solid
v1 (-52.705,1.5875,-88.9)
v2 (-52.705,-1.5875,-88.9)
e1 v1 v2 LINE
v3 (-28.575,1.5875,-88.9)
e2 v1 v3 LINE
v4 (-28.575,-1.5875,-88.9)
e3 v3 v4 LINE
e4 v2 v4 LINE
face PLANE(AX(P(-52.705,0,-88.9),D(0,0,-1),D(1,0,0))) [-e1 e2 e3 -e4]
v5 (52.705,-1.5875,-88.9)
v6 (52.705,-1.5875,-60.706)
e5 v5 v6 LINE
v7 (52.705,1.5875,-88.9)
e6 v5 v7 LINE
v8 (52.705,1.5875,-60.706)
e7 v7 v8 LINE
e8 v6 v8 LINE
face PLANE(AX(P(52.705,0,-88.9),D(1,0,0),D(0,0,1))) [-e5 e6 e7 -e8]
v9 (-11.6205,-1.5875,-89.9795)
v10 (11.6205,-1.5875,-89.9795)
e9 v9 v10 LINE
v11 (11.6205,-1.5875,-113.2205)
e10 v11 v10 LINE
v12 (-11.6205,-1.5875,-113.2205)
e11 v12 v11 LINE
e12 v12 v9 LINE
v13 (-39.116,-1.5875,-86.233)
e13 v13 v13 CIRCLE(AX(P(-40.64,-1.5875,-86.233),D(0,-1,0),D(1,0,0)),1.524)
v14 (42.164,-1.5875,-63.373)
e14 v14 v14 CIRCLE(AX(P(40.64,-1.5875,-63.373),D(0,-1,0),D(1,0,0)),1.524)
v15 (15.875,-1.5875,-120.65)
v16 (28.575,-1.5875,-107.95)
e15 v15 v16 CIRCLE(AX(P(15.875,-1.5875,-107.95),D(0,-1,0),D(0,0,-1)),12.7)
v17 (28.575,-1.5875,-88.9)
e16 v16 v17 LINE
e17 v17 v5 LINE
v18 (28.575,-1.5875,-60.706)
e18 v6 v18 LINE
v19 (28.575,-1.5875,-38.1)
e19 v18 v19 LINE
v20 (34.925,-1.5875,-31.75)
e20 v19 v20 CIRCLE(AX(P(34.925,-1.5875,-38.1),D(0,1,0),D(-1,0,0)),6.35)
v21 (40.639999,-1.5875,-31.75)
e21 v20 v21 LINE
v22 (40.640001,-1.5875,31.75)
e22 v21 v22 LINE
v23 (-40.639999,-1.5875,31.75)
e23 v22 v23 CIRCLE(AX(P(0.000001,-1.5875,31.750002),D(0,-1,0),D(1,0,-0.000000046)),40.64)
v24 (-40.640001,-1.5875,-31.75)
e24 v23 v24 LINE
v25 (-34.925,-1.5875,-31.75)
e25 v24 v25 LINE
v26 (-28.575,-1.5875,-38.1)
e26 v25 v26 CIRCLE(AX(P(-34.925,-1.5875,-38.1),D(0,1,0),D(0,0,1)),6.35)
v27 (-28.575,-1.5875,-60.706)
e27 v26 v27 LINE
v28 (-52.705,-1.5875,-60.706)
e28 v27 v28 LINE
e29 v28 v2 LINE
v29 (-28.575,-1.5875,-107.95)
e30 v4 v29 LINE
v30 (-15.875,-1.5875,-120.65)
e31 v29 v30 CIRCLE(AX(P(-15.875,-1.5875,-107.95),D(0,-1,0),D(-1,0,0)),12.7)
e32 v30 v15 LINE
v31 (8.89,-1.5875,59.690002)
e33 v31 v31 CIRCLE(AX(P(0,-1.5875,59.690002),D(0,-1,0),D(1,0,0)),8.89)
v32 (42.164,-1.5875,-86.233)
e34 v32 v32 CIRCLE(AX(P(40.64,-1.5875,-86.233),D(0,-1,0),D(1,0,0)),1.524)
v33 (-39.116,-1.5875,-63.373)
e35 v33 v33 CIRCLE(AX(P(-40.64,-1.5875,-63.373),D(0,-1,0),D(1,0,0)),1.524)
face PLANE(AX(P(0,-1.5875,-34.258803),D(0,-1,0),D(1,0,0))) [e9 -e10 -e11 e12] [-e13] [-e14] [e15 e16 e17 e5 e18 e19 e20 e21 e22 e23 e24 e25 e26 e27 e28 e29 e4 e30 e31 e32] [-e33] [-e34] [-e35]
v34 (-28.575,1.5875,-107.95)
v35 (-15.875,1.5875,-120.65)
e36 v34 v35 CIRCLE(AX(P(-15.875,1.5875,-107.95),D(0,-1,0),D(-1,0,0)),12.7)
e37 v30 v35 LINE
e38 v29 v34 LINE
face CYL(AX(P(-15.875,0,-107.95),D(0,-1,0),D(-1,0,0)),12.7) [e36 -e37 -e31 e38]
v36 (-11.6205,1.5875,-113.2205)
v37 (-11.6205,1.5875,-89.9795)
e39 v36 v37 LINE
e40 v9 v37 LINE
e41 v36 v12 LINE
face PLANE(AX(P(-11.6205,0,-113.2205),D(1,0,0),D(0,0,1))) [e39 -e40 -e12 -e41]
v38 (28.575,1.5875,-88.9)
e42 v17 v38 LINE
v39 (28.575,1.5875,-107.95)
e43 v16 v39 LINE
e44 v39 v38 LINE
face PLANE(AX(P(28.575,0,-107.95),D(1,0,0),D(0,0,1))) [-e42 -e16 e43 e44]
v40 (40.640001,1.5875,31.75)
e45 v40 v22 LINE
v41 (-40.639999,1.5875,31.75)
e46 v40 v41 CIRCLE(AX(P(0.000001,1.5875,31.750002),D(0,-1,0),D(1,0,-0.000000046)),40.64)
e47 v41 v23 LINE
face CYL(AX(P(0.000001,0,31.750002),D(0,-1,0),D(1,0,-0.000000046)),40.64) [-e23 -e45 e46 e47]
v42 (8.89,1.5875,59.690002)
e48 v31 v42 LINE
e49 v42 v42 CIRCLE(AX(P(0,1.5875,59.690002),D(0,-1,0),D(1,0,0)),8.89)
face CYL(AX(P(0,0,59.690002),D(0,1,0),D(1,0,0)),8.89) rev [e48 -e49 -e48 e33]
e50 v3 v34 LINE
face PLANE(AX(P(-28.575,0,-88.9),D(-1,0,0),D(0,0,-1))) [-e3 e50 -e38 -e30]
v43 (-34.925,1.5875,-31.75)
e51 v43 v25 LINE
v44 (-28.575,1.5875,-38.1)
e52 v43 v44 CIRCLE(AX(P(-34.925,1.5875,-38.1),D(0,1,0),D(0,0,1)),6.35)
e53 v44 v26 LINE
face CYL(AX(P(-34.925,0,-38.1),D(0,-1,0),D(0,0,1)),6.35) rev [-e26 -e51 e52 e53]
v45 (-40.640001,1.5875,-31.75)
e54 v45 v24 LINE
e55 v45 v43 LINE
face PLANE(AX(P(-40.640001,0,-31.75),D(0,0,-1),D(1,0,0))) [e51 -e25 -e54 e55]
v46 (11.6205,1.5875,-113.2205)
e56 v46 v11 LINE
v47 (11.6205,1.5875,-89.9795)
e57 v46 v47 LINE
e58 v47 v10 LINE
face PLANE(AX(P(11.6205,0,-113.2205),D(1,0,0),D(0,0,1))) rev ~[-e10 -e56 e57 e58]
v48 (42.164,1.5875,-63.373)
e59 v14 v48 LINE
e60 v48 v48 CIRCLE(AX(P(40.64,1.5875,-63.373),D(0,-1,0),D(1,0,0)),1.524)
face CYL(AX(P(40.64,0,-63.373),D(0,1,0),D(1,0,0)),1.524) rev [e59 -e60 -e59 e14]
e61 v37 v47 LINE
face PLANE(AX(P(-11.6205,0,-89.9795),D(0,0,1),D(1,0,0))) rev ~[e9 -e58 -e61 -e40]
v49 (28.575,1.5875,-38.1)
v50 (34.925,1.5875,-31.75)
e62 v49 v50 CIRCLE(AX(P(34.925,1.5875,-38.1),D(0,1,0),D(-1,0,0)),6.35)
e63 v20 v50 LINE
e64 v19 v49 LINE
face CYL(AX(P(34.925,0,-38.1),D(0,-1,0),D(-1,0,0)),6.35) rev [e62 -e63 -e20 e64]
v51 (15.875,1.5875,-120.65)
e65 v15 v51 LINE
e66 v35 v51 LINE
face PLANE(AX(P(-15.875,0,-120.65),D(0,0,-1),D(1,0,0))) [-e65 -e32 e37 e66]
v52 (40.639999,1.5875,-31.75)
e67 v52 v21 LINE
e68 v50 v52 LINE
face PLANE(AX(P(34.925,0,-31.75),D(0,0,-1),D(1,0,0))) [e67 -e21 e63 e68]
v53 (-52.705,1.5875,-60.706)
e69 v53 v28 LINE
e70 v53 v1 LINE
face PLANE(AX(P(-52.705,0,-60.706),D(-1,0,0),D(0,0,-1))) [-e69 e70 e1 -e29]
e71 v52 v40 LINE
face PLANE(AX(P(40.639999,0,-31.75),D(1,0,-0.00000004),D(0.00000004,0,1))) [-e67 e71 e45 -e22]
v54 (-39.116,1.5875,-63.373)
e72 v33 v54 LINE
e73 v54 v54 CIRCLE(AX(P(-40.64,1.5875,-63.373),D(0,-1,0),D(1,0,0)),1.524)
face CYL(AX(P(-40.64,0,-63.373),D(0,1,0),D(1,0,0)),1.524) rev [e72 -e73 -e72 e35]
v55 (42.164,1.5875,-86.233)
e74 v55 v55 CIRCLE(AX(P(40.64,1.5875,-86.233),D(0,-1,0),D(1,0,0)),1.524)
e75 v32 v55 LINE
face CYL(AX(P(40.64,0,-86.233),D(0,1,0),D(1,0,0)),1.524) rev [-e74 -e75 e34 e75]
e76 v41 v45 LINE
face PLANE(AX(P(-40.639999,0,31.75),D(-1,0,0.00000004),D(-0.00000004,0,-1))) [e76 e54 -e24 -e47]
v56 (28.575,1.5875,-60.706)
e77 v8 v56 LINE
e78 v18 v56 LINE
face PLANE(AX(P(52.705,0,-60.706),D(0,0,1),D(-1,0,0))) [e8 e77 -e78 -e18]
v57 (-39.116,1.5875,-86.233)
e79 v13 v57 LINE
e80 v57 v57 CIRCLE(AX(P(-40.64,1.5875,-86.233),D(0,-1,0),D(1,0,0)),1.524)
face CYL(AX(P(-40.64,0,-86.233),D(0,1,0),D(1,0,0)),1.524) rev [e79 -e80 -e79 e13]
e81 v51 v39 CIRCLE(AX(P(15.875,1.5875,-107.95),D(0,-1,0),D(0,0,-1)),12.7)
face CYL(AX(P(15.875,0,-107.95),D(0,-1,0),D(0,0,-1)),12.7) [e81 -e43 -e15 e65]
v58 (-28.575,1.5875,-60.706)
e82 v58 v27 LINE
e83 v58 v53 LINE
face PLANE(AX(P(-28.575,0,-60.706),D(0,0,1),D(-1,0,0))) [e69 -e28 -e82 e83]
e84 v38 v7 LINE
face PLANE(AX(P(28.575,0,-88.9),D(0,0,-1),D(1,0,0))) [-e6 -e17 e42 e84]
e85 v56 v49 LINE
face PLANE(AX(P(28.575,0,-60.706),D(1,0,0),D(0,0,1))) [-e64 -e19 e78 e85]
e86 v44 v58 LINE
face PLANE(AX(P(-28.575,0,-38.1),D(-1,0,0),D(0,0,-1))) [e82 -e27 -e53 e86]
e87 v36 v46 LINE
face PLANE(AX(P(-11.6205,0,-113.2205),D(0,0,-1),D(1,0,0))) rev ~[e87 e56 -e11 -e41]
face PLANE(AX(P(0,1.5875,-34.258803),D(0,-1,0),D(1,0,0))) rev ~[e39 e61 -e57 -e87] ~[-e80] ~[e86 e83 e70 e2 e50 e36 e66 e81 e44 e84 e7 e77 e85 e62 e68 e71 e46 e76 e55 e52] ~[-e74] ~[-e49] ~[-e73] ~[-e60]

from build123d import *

# Parameters (mm, degrees)
F0_R     = 1.524
F0_W     = 23.241
F0_H     = 23.241
F0_R_2   = 8.89
F1_DEPTH = 1.5875


# Not quite as in the source:
# - a length typed as a fraction of an inch, garbled in the dataset ("3 / 203.2 mm" for 3/8 in), is restored


with BuildPart() as f1:
    # F0 (on Front) → F1 (new body, symmetric)
    with BuildSketch(Plane.XZ):
        with BuildLine():
            Line((34.925, -31.75), (40.6399987437, -31.75))
            Line((40.6399987437, -31.75), (40.6400012563, 31.75))
            ThreePointArc((40.6400012563, 31.75), (1.2563e-06, 72.3900018664), (-40.6399987437, 31.75))
            Line((-40.6399987437, 31.75), (-40.6400012563, -31.75))
            Line((-40.6400012563, -31.75), (-34.925, -31.75))
            ThreePointArc((-34.925, -31.75), (-30.4348719395, -33.6098719395), (-28.575, -38.1))
            Line((-28.575, -38.1), (-28.575, -60.706))
            Line((-28.575, -60.706), (-52.705, -60.706))
            Line((-52.705, -60.706), (-52.705, -88.9))
            Line((-52.705, -88.9), (-28.575, -88.9))
            Line((-28.575, -88.9), (-28.575, -107.95))
            ThreePointArc((-28.575, -107.95), (-24.8552561211, -116.9302561211), (-15.875, -120.65))
            Line((-15.875, -120.65), (15.875, -120.65))
            ThreePointArc((15.875, -120.65), (24.8552561211, -116.9302561211), (28.575, -107.95))
            Line((28.575, -107.95), (28.575, -88.9))
            Line((28.575, -88.9), (52.705, -88.9))
            Line((52.705, -88.9), (52.705, -60.706))
            Line((52.705, -60.706), (28.575, -60.706))
            Line((28.575, -60.706), (28.575, -38.1))
            ThreePointArc((28.575, -38.1), (30.4348719395, -33.6098719395), (34.925, -31.75))
        make_face()
        with Locations((-40.64, -86.233)):
            Circle(F0_R, mode=Mode.SUBTRACT)
        with Locations((-40.64, -63.373)):
            Circle(F0_R, mode=Mode.SUBTRACT)
        with Locations((0, -101.6)):
            Rectangle(F0_W, F0_H, mode=Mode.SUBTRACT)
        with Locations((40.64, -86.233)):
            Circle(F0_R, mode=Mode.SUBTRACT)
        with Locations((40.64, -63.373)):
            Circle(F0_R, mode=Mode.SUBTRACT)
        with Locations((0, 59.6900018664)):
            Circle(F0_R_2, mode=Mode.SUBTRACT)
    extrude(amount=F1_DEPTH, both=True)


solid = f1.part
